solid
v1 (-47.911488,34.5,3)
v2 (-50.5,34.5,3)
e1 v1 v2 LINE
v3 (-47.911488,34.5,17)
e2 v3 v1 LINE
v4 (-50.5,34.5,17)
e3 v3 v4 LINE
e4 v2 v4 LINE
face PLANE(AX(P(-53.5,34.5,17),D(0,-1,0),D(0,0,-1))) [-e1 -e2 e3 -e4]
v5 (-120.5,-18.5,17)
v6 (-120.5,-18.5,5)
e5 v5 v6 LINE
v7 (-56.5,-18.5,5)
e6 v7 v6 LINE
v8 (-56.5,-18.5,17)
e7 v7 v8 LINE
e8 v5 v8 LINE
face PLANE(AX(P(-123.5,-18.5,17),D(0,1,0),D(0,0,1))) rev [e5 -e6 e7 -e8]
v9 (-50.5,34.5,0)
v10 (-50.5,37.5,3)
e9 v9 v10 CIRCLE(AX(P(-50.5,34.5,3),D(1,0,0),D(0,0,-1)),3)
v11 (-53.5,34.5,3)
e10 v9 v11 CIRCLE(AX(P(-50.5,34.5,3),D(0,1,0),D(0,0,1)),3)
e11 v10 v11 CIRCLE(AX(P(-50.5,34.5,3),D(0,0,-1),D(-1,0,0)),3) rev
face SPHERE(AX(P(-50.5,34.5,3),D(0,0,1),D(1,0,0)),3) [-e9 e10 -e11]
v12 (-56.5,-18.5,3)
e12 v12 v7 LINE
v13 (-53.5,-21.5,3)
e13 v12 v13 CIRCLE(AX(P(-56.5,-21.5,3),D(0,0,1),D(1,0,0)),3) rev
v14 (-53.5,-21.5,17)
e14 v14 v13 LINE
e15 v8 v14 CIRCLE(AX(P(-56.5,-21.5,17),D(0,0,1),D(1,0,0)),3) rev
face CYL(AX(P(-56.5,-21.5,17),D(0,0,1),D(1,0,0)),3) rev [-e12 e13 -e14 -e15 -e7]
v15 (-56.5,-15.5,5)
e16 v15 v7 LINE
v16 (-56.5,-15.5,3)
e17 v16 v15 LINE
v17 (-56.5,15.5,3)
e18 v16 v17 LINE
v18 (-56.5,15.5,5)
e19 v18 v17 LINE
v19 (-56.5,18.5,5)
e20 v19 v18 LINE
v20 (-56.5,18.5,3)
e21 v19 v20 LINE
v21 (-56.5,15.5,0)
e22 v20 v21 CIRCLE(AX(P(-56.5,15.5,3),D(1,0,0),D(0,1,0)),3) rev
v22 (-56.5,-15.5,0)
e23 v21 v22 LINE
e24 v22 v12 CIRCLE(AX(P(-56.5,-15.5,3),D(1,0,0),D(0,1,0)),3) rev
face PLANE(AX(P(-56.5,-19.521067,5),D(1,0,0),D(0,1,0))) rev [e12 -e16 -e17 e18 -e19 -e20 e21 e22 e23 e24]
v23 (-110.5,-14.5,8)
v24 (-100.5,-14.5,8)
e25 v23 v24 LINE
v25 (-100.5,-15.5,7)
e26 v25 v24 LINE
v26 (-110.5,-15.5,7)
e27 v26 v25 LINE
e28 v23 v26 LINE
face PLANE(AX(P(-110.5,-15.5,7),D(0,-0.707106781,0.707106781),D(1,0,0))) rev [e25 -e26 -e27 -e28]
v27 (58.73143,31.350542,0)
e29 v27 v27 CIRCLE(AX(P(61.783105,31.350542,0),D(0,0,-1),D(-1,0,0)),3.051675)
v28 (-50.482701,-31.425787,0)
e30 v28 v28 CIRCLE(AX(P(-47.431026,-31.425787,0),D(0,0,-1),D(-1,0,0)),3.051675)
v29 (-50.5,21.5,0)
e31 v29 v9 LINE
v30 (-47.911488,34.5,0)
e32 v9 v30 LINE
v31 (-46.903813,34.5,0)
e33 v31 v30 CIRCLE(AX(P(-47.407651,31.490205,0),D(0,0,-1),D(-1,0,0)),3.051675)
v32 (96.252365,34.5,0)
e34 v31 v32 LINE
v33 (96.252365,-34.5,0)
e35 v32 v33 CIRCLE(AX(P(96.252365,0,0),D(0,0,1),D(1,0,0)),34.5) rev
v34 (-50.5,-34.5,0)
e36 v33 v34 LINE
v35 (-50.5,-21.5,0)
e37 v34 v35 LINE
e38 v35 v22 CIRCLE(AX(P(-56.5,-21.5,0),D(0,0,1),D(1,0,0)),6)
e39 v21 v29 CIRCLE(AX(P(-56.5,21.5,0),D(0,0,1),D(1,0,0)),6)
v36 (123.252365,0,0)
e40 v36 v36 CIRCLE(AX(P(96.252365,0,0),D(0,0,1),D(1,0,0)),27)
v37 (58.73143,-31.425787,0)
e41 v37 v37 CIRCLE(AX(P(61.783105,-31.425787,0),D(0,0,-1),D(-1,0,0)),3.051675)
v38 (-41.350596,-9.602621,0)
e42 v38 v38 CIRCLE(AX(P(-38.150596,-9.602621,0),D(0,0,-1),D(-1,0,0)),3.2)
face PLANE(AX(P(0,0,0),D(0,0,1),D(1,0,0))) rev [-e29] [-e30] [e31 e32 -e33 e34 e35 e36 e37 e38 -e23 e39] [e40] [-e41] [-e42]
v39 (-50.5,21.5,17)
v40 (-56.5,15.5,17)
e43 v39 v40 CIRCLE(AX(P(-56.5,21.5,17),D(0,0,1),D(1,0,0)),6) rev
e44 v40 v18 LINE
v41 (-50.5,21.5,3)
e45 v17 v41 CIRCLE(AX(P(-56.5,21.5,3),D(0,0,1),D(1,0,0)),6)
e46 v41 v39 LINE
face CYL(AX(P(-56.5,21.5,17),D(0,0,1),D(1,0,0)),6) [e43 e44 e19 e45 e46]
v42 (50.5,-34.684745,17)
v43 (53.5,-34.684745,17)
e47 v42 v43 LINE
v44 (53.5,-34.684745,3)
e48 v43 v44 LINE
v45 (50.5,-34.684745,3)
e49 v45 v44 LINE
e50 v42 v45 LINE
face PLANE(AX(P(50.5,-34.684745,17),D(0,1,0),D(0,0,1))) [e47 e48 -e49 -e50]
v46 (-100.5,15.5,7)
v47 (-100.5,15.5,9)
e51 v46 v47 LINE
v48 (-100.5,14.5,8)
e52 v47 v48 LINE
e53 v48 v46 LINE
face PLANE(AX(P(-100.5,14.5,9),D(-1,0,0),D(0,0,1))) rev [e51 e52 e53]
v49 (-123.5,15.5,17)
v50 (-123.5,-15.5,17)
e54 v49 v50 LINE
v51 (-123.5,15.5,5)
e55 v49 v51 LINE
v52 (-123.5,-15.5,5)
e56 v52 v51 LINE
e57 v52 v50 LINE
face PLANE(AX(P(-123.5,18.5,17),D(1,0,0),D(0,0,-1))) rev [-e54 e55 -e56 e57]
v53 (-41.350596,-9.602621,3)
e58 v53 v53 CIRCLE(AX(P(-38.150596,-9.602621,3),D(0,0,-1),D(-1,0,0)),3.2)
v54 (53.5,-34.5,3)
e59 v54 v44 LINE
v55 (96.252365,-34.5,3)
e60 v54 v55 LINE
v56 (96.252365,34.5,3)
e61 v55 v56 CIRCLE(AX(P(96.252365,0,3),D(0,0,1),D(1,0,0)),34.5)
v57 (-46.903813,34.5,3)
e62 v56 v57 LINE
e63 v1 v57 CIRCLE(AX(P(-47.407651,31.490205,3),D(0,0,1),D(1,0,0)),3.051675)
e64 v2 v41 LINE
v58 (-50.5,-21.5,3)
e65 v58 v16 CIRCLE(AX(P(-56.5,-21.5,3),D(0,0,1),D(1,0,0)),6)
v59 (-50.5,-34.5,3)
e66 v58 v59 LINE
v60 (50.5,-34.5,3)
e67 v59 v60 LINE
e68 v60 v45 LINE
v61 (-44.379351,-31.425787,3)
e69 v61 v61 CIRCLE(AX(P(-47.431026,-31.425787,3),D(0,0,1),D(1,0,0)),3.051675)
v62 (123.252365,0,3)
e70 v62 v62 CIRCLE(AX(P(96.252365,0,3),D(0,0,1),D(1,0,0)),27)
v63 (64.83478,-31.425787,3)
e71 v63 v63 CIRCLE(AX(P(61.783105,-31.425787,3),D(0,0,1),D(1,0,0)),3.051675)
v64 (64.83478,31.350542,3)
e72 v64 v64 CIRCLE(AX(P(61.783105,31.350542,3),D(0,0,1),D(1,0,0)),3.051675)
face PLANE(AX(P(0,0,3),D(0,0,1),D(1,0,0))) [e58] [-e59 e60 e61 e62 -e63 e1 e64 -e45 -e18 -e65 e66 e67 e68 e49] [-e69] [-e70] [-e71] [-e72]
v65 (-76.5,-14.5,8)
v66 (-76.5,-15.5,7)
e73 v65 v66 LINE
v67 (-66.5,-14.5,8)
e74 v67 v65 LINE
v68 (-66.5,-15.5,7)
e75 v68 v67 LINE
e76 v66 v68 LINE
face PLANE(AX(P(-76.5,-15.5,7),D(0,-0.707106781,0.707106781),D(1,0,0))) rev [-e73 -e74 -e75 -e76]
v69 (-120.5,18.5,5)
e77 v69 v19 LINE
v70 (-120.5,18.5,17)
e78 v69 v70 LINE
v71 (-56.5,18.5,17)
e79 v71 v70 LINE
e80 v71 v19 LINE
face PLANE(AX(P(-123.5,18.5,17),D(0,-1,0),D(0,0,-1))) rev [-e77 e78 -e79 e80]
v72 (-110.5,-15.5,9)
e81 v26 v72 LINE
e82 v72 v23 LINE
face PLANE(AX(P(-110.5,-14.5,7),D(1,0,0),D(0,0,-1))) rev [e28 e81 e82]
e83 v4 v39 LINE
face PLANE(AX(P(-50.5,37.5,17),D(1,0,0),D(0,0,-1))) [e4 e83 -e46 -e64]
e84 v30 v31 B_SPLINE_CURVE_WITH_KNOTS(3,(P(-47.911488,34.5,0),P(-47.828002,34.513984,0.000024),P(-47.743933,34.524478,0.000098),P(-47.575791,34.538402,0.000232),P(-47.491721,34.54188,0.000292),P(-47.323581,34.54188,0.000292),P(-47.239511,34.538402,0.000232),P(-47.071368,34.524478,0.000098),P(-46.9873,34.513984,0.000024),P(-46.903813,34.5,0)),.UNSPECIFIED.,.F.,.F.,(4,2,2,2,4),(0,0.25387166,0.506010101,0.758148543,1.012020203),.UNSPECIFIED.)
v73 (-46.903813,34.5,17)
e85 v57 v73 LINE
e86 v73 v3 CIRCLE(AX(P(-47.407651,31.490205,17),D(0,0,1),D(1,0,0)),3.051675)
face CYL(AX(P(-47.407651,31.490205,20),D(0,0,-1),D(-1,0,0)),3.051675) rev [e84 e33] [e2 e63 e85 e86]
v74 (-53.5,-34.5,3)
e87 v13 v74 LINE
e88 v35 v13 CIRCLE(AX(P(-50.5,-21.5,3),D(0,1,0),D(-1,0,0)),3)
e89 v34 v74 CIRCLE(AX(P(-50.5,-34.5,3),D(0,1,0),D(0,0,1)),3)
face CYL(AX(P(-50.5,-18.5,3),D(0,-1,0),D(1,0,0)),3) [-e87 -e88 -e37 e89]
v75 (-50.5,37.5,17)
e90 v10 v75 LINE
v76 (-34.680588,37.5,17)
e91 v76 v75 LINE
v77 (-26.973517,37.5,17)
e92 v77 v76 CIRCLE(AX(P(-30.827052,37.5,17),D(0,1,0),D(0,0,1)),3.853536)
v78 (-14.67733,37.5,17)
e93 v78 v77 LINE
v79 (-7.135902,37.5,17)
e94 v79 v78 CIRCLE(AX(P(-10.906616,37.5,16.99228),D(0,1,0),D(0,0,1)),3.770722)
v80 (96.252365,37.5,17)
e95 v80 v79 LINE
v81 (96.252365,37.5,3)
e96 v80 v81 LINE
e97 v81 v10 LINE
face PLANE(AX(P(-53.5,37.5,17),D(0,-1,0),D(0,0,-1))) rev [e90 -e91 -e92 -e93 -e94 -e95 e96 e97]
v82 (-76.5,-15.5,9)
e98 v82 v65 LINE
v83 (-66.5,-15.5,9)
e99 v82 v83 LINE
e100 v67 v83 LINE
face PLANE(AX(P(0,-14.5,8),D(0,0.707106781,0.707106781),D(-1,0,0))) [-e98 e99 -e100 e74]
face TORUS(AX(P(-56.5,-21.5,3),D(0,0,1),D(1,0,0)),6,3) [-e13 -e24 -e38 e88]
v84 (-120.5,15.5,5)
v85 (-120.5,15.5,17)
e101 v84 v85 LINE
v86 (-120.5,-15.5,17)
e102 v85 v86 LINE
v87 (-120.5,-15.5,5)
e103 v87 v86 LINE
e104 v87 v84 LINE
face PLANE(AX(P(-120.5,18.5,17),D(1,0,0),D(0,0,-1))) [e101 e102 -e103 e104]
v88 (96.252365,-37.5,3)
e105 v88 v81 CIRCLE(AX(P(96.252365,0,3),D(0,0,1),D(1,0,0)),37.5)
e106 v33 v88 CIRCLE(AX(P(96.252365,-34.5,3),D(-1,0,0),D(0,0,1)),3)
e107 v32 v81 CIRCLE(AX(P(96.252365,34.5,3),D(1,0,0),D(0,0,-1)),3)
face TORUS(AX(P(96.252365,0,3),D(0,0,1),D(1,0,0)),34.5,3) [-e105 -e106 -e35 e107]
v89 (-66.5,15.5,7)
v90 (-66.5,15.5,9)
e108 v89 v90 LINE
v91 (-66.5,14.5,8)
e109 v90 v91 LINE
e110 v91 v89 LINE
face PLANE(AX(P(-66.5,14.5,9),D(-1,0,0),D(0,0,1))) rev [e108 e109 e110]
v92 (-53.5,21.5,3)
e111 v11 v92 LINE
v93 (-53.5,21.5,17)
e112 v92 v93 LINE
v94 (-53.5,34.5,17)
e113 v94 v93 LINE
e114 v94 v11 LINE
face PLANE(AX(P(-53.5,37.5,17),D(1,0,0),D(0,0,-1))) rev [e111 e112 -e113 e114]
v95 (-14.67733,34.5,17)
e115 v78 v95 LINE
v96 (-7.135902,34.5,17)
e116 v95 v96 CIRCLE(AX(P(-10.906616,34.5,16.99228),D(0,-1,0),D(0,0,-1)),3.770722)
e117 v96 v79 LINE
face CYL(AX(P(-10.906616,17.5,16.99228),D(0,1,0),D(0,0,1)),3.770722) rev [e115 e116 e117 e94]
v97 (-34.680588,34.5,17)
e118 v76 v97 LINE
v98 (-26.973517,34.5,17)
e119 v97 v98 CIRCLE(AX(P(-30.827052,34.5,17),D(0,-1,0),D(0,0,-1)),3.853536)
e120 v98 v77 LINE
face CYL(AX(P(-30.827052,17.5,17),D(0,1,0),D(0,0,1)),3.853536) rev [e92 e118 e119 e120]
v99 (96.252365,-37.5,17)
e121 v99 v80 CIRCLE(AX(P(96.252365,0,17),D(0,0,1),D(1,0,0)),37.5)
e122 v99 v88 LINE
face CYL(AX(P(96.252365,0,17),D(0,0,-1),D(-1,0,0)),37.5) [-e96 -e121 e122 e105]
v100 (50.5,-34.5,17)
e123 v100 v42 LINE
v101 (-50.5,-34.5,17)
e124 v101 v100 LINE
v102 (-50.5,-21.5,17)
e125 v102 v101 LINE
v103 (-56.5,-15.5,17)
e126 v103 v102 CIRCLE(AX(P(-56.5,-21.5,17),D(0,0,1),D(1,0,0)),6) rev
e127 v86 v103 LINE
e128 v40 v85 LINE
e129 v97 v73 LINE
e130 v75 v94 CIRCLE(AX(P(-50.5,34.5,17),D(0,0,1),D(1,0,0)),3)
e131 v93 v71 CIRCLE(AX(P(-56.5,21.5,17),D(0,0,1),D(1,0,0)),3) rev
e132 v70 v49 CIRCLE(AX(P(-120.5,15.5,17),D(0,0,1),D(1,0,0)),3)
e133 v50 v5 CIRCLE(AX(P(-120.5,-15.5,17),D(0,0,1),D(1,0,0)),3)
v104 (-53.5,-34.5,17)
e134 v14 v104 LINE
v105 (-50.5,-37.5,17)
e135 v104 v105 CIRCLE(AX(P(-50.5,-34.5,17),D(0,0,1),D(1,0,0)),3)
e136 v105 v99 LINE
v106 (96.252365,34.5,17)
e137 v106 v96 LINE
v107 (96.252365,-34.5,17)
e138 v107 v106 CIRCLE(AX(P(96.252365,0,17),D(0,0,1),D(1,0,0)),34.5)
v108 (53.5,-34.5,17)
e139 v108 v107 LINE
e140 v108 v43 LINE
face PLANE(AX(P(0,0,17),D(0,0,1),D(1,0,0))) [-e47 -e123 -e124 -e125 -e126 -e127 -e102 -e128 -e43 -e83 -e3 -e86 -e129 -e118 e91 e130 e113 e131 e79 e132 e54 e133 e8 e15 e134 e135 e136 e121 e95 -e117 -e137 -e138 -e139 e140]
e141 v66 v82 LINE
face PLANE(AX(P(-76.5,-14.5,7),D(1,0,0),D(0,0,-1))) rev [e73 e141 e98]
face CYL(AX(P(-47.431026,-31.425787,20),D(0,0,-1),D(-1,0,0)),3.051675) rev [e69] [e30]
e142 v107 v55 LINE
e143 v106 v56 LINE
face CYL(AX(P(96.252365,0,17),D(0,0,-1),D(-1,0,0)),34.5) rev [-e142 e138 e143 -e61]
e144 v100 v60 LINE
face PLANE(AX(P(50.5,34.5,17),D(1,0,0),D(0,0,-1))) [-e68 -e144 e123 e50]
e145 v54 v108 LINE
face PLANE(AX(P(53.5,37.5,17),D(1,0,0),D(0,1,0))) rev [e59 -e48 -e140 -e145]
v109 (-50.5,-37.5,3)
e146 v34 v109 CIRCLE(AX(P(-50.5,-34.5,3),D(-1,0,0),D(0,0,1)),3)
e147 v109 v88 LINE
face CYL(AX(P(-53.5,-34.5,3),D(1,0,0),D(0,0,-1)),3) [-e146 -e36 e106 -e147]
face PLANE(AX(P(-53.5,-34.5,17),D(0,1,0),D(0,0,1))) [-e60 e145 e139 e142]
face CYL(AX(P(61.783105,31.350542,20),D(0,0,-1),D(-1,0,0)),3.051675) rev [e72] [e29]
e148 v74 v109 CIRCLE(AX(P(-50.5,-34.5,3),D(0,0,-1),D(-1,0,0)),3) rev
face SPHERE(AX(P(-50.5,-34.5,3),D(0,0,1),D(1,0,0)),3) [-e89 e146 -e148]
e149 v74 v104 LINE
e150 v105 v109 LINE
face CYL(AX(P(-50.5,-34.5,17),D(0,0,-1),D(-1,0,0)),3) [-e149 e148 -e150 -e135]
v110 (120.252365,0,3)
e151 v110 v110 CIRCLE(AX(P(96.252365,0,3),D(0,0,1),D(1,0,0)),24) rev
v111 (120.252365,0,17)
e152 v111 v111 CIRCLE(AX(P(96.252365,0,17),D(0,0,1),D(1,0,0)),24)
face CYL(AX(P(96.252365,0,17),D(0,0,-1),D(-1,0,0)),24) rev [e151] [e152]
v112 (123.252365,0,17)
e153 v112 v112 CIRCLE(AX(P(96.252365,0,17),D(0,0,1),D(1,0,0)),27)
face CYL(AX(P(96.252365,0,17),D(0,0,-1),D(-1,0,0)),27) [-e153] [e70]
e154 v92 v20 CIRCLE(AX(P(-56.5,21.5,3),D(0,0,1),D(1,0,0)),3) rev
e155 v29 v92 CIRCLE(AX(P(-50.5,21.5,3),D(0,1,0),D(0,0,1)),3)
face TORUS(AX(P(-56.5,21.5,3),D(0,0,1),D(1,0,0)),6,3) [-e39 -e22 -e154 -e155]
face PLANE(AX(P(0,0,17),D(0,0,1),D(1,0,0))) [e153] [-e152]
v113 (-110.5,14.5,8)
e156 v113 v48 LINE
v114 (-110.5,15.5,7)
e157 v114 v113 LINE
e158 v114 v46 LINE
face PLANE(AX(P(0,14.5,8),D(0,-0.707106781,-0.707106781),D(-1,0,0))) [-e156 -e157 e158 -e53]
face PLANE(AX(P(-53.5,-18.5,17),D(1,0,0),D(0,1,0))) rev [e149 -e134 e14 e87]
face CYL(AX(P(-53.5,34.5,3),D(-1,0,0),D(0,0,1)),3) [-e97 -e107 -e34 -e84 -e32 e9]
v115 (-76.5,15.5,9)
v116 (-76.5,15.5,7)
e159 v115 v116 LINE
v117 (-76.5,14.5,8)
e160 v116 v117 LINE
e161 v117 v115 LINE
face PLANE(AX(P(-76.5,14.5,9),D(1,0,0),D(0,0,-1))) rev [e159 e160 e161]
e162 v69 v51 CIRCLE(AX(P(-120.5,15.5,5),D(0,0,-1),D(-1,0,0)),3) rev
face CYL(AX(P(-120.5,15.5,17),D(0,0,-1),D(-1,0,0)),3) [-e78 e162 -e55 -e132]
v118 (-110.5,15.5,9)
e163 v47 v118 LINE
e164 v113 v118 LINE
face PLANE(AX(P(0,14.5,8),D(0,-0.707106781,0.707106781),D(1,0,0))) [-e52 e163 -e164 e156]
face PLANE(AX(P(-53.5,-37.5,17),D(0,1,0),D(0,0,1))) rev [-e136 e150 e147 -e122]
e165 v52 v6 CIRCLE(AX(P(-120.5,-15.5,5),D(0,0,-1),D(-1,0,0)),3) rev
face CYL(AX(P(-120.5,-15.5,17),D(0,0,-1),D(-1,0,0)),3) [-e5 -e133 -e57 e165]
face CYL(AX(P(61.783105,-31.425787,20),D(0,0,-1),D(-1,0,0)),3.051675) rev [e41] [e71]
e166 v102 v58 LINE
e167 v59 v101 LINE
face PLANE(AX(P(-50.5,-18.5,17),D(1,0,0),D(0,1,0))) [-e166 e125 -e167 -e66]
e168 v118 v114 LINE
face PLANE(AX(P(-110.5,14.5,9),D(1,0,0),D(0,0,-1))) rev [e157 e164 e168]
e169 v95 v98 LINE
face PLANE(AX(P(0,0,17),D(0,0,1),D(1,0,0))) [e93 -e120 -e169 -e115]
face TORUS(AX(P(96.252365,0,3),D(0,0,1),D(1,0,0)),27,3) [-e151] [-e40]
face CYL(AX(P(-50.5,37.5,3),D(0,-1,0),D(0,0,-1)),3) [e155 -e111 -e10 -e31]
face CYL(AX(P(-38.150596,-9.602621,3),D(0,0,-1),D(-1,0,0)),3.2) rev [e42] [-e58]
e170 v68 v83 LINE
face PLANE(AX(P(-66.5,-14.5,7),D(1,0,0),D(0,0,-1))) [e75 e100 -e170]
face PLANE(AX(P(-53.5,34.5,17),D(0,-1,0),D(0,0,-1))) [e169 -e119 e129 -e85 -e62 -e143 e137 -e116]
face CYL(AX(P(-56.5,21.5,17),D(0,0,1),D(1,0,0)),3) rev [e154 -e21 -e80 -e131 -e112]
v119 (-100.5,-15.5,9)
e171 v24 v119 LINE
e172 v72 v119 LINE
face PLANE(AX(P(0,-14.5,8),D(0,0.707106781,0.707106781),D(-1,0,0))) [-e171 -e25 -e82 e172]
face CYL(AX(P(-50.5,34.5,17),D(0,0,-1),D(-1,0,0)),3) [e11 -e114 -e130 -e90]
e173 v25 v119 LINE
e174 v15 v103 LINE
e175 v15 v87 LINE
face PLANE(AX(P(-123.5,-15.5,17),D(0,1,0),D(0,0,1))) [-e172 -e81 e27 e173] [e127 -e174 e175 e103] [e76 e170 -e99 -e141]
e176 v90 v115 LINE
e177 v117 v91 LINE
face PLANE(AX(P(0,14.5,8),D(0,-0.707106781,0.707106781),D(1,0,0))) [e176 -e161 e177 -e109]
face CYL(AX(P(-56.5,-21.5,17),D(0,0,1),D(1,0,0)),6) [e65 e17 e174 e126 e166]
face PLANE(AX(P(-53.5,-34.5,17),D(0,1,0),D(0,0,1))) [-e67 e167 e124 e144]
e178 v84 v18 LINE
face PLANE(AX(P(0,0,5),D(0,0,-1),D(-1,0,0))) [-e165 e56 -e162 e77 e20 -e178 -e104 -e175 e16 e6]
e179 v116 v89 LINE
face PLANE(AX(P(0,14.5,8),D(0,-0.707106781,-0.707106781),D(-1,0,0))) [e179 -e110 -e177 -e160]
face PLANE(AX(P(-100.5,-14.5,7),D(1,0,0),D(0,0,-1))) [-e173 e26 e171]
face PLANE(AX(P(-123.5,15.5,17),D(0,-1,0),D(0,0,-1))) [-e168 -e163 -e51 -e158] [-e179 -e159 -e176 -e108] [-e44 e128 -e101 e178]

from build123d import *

# Parameters (mm, degrees)
BOSS_EXTRUDE1_DEPTH = 17
FILLET1_R           = 3
SHELL2_START        = 3
SHELL2_DEPTH        = 14
CUT_EXTRUDE1_START  = 3
SKETCH2_W           = 3
SKETCH2_H           = 69.184745233
CUT_EXTRUDE1_DEPTH  = 14
SKETCH4_R           = 24
BOSS_EXTRUDE2_DEPTH = 17
SHELL4_START        = 3
SHELL4_OUTLINE_R    = 27
SHELL4_DEPTH        = 14
SKETCH7_W           = 3
SKETCH7_H           = 69
CUT_EXTRUDE3_DEPTH  = 14
SKETCH8_R           = 3.051675087
CUT_EXTRUDE4_DEPTH  = 20
SKETCH9_R           = 3.853535646
SKETCH9_R_2         = 3.770722203
CUT_EXTRUDE5_DEPTH  = 20
SKETCH11_W          = 68.674120891
SKETCH11_H          = 38.021066824
CUT_EXTRUDE8_DEPTH  = 5
SKETCH15_W          = 10
SKETCH15_H          = 2
BOSS_EXTRUDE3_DEPTH = 1
CHAMFER1_SIZE       = 1
SKETCH14_W          = 10
SKETCH14_H          = 2
BOSS_EXTRUDE4_DEPTH = 1
CHAMFER2_SIZE       = 1
FILLET2_R           = 3
SKETCH16_R          = 3.2
CUT_EXTRUDE9_DEPTH  = 3


# Read off the part's stored shape, not the designer's step: Shell2, Shell4
with BuildPart() as part:
    # Sketch1 → Boss-Extrude1 (new body)
    with BuildSketch(Plane.XY):
        Polygon((-53.5, -18.5), (-53.5, -37.5), (53.5, -37.5), (53.5, 37.5), (-53.5, 37.5), (-53.5, 18.5), (-123.5, 18.5), (-123.5, -18.5), align=None)
    extrude(amount=BOSS_EXTRUDE1_DEPTH)

    # Fillet1
    fillet1_edges = [part.edges().sort_by_distance(p)[0] for p in [
        (-53.5, -37.5, 8.5),
        (-53.5, -18.5, 8.5),
        (-123.5, -18.5, 8.5),
        (-123.5, 18.5, 8.5),
        (-53.5, 18.5, 8.5),
        (-53.5, 37.5, 8.5),
    ]]
    fillet(fillet1_edges, radius=FILLET1_R)

    # Shell2 outline → Shell2 (cut)
    with BuildSketch(Plane.XY.offset(SHELL2_START)):
        with BuildLine():
            Line((50.5, -34.5), (50.5, 34.5))
            Line((50.5, 34.5), (-50.5, 34.5))
            Line((-50.5, 34.5), (-50.5, 21.5))
            ThreePointArc((-50.5, 21.5), (-52.257359313, 17.257359313), (-56.5, 15.5))
            Line((-56.5, 15.5), (-120.5, 15.5))
            Line((-120.5, 15.5), (-120.5, -15.5))
            Line((-120.5, -15.5), (-56.5, -15.5))
            ThreePointArc((-56.5, -15.5), (-52.257359313, -17.257359313), (-50.5, -21.5))
            Line((-50.5, -21.5), (-50.5, -34.5))
            Line((-50.5, -34.5), (50.5, -34.5))
        make_face()
    extrude(amount=SHELL2_DEPTH, mode=Mode.SUBTRACT)

    # Sketch2 → Cut-Extrude1 (cut)
    with BuildSketch(Plane.XY.offset(CUT_EXTRUDE1_START)):
        with Locations((52, -0.092372617)):
            Rectangle(SKETCH2_W, SKETCH2_H)
    extrude(amount=CUT_EXTRUDE1_DEPTH, mode=Mode.SUBTRACT)

    # Sketch4 → Boss-Extrude2 (add)
    with BuildSketch(Plane.XY):
        with BuildLine():
            Line((53.5, 37.5), (96.25236473, 37.5))
            ThreePointArc((96.25236473, 37.5), (133.75236473, 0), (96.25236473, -37.5))
            Line((96.25236473, -37.5), (53.5, -37.5))
            Line((53.5, -37.5), (53.5, 37.5))
        make_face()
        with Locations((96.25236473, 0)):
            Circle(SKETCH4_R, mode=Mode.SUBTRACT)
    extrude(amount=BOSS_EXTRUDE2_DEPTH)

    # Shell4 outline → Shell4 (cut)
    with BuildSketch(Plane.XY.offset(SHELL4_START)):
        with BuildLine():
            Line((96.25236473, 34.5), (56.5, 34.5))
            Line((56.5, 34.5), (56.5, -34.5))
            Line((56.5, -34.5), (96.25236473, -34.5))
            ThreePointArc((96.25236473, -34.5), (130.75236473, 0), (96.25236473, 34.5))
        make_face()
        with Locations((96.25236473, 0)):
            Circle(SHELL4_OUTLINE_R, mode=Mode.SUBTRACT)
    extrude(amount=SHELL4_DEPTH, mode=Mode.SUBTRACT)

    # Sketch7 → Cut-Extrude3 (cut)
    with BuildSketch(Plane.XY.offset(17)):
        with Locations((55, 0)):
            Rectangle(SKETCH7_W, SKETCH7_H)
    extrude(amount=-CUT_EXTRUDE3_DEPTH, mode=Mode.SUBTRACT)

    # Sketch8 → Cut-Extrude4 (cut)
    with BuildSketch(Plane(origin=(0, 0, 0), x_dir=(-1, 0, 0), z_dir=(0, 0, -1))):
        with Locations((47.431025643, -31.425786946)):
            Circle(SKETCH8_R)
        with Locations((47.407650962, 31.49020456)):
            Circle(SKETCH8_R)
        with Locations((-61.783104826, 31.350542021)):
            Circle(SKETCH8_R)
        with Locations((-61.783104826, -31.425786946)):
            Circle(SKETCH8_R)
    extrude(amount=-CUT_EXTRUDE4_DEPTH, mode=Mode.SUBTRACT)

    # Sketch9 → Cut-Extrude5 (cut)
    with BuildSketch(Plane(origin=(0, 37.5, 0), x_dir=(1, 0, 0), z_dir=(0, 1, 0))):
        with Locations((-30.827052477, -17)):
            Circle(SKETCH9_R)
        with Locations((-10.906615981, -16.992280087)):
            Circle(SKETCH9_R_2)
    extrude(amount=-CUT_EXTRUDE5_DEPTH, mode=Mode.SUBTRACT)

    # Sketch11 → Cut-Extrude8 (cut)
    with BuildSketch(Plane(origin=(0, 0, 0), x_dir=(-1, 0, 0), z_dir=(0, 0, -1))):
        with Locations((90.837060446, -0.510533412)):
            Rectangle(SKETCH11_W, SKETCH11_H)
    extrude(amount=-CUT_EXTRUDE8_DEPTH, mode=Mode.SUBTRACT)

    # Sketch15 → Boss-Extrude3 (add)
    with BuildSketch(Plane.XZ.offset(-15.5)):
        with Locations((-71.5, 8)):
            Rectangle(SKETCH15_W, SKETCH15_H)
        with Locations((-105.5, 8)):
            Rectangle(SKETCH15_W, SKETCH15_H)
    extrude(amount=BOSS_EXTRUDE3_DEPTH)

    # Chamfer1
    chamfer1_edges = [part.edges().sort_by_distance(p)[0] for p in [
        (-105.5, 14.5, 9),
        (-105.5, 14.5, 7),
        (-71.5, 14.5, 9),
        (-71.5, 14.5, 7),
    ]]
    chamfer(chamfer1_edges, length=CHAMFER1_SIZE - 0.0001)  # a hair under: the kernel refuses the full size

    # Sketch14 → Boss-Extrude4 (add)
    with BuildSketch(Plane(origin=(0, -15.5, 0), x_dir=(1, 0, 0), z_dir=(0, 1, 0))):
        with Locations((-71.5, -8)):
            Rectangle(SKETCH14_W, SKETCH14_H)
        with Locations((-105.5, -8)):
            Rectangle(SKETCH14_W, SKETCH14_H)
    extrude(amount=BOSS_EXTRUDE4_DEPTH)

    # Chamfer2
    chamfer2_edges = [part.edges().sort_by_distance(p)[0] for p in [
        (-105.5, -14.5, 7),
        (-105.5, -14.5, 9),
        (-71.5, -14.5, 9),
        (-71.5, -14.5, 7),
    ]]
    chamfer(chamfer2_edges, length=CHAMFER2_SIZE - 0.0001)  # a hair under: the kernel refuses the full size

    # Fillet2
    fillet2_edges = [part.edges().sort_by_distance(p)[0] for p in [
        (72.25236473, 0, 0),
        (133.75236473, 0, 0),
        (22.876182365, 37.5, 0),
        (22.876182365, -37.5, 0),
        (-53.5, -28, 0),
        (-53.5, 28, 0),
        (-52.621320344, 36.621320344, 0),
        (-52.621320344, -36.621320344, 0),
        (-54.378679656, -19.378679656, 0),
        (-54.378679656, 19.378679656, 0),
    ]]
    fillet(fillet2_edges, radius=FILLET2_R)

    # Sketch16 → Cut-Extrude9 (cut)
    with BuildSketch(Plane(origin=(0, 0, 0), x_dir=(-1, 0, 0), z_dir=(0, 0, -1))):
        with Locations((38.150596078, -9.60262109)):
            Circle(SKETCH16_R)
    extrude(amount=-CUT_EXTRUDE9_DEPTH, mode=Mode.SUBTRACT)


solid = part.part
